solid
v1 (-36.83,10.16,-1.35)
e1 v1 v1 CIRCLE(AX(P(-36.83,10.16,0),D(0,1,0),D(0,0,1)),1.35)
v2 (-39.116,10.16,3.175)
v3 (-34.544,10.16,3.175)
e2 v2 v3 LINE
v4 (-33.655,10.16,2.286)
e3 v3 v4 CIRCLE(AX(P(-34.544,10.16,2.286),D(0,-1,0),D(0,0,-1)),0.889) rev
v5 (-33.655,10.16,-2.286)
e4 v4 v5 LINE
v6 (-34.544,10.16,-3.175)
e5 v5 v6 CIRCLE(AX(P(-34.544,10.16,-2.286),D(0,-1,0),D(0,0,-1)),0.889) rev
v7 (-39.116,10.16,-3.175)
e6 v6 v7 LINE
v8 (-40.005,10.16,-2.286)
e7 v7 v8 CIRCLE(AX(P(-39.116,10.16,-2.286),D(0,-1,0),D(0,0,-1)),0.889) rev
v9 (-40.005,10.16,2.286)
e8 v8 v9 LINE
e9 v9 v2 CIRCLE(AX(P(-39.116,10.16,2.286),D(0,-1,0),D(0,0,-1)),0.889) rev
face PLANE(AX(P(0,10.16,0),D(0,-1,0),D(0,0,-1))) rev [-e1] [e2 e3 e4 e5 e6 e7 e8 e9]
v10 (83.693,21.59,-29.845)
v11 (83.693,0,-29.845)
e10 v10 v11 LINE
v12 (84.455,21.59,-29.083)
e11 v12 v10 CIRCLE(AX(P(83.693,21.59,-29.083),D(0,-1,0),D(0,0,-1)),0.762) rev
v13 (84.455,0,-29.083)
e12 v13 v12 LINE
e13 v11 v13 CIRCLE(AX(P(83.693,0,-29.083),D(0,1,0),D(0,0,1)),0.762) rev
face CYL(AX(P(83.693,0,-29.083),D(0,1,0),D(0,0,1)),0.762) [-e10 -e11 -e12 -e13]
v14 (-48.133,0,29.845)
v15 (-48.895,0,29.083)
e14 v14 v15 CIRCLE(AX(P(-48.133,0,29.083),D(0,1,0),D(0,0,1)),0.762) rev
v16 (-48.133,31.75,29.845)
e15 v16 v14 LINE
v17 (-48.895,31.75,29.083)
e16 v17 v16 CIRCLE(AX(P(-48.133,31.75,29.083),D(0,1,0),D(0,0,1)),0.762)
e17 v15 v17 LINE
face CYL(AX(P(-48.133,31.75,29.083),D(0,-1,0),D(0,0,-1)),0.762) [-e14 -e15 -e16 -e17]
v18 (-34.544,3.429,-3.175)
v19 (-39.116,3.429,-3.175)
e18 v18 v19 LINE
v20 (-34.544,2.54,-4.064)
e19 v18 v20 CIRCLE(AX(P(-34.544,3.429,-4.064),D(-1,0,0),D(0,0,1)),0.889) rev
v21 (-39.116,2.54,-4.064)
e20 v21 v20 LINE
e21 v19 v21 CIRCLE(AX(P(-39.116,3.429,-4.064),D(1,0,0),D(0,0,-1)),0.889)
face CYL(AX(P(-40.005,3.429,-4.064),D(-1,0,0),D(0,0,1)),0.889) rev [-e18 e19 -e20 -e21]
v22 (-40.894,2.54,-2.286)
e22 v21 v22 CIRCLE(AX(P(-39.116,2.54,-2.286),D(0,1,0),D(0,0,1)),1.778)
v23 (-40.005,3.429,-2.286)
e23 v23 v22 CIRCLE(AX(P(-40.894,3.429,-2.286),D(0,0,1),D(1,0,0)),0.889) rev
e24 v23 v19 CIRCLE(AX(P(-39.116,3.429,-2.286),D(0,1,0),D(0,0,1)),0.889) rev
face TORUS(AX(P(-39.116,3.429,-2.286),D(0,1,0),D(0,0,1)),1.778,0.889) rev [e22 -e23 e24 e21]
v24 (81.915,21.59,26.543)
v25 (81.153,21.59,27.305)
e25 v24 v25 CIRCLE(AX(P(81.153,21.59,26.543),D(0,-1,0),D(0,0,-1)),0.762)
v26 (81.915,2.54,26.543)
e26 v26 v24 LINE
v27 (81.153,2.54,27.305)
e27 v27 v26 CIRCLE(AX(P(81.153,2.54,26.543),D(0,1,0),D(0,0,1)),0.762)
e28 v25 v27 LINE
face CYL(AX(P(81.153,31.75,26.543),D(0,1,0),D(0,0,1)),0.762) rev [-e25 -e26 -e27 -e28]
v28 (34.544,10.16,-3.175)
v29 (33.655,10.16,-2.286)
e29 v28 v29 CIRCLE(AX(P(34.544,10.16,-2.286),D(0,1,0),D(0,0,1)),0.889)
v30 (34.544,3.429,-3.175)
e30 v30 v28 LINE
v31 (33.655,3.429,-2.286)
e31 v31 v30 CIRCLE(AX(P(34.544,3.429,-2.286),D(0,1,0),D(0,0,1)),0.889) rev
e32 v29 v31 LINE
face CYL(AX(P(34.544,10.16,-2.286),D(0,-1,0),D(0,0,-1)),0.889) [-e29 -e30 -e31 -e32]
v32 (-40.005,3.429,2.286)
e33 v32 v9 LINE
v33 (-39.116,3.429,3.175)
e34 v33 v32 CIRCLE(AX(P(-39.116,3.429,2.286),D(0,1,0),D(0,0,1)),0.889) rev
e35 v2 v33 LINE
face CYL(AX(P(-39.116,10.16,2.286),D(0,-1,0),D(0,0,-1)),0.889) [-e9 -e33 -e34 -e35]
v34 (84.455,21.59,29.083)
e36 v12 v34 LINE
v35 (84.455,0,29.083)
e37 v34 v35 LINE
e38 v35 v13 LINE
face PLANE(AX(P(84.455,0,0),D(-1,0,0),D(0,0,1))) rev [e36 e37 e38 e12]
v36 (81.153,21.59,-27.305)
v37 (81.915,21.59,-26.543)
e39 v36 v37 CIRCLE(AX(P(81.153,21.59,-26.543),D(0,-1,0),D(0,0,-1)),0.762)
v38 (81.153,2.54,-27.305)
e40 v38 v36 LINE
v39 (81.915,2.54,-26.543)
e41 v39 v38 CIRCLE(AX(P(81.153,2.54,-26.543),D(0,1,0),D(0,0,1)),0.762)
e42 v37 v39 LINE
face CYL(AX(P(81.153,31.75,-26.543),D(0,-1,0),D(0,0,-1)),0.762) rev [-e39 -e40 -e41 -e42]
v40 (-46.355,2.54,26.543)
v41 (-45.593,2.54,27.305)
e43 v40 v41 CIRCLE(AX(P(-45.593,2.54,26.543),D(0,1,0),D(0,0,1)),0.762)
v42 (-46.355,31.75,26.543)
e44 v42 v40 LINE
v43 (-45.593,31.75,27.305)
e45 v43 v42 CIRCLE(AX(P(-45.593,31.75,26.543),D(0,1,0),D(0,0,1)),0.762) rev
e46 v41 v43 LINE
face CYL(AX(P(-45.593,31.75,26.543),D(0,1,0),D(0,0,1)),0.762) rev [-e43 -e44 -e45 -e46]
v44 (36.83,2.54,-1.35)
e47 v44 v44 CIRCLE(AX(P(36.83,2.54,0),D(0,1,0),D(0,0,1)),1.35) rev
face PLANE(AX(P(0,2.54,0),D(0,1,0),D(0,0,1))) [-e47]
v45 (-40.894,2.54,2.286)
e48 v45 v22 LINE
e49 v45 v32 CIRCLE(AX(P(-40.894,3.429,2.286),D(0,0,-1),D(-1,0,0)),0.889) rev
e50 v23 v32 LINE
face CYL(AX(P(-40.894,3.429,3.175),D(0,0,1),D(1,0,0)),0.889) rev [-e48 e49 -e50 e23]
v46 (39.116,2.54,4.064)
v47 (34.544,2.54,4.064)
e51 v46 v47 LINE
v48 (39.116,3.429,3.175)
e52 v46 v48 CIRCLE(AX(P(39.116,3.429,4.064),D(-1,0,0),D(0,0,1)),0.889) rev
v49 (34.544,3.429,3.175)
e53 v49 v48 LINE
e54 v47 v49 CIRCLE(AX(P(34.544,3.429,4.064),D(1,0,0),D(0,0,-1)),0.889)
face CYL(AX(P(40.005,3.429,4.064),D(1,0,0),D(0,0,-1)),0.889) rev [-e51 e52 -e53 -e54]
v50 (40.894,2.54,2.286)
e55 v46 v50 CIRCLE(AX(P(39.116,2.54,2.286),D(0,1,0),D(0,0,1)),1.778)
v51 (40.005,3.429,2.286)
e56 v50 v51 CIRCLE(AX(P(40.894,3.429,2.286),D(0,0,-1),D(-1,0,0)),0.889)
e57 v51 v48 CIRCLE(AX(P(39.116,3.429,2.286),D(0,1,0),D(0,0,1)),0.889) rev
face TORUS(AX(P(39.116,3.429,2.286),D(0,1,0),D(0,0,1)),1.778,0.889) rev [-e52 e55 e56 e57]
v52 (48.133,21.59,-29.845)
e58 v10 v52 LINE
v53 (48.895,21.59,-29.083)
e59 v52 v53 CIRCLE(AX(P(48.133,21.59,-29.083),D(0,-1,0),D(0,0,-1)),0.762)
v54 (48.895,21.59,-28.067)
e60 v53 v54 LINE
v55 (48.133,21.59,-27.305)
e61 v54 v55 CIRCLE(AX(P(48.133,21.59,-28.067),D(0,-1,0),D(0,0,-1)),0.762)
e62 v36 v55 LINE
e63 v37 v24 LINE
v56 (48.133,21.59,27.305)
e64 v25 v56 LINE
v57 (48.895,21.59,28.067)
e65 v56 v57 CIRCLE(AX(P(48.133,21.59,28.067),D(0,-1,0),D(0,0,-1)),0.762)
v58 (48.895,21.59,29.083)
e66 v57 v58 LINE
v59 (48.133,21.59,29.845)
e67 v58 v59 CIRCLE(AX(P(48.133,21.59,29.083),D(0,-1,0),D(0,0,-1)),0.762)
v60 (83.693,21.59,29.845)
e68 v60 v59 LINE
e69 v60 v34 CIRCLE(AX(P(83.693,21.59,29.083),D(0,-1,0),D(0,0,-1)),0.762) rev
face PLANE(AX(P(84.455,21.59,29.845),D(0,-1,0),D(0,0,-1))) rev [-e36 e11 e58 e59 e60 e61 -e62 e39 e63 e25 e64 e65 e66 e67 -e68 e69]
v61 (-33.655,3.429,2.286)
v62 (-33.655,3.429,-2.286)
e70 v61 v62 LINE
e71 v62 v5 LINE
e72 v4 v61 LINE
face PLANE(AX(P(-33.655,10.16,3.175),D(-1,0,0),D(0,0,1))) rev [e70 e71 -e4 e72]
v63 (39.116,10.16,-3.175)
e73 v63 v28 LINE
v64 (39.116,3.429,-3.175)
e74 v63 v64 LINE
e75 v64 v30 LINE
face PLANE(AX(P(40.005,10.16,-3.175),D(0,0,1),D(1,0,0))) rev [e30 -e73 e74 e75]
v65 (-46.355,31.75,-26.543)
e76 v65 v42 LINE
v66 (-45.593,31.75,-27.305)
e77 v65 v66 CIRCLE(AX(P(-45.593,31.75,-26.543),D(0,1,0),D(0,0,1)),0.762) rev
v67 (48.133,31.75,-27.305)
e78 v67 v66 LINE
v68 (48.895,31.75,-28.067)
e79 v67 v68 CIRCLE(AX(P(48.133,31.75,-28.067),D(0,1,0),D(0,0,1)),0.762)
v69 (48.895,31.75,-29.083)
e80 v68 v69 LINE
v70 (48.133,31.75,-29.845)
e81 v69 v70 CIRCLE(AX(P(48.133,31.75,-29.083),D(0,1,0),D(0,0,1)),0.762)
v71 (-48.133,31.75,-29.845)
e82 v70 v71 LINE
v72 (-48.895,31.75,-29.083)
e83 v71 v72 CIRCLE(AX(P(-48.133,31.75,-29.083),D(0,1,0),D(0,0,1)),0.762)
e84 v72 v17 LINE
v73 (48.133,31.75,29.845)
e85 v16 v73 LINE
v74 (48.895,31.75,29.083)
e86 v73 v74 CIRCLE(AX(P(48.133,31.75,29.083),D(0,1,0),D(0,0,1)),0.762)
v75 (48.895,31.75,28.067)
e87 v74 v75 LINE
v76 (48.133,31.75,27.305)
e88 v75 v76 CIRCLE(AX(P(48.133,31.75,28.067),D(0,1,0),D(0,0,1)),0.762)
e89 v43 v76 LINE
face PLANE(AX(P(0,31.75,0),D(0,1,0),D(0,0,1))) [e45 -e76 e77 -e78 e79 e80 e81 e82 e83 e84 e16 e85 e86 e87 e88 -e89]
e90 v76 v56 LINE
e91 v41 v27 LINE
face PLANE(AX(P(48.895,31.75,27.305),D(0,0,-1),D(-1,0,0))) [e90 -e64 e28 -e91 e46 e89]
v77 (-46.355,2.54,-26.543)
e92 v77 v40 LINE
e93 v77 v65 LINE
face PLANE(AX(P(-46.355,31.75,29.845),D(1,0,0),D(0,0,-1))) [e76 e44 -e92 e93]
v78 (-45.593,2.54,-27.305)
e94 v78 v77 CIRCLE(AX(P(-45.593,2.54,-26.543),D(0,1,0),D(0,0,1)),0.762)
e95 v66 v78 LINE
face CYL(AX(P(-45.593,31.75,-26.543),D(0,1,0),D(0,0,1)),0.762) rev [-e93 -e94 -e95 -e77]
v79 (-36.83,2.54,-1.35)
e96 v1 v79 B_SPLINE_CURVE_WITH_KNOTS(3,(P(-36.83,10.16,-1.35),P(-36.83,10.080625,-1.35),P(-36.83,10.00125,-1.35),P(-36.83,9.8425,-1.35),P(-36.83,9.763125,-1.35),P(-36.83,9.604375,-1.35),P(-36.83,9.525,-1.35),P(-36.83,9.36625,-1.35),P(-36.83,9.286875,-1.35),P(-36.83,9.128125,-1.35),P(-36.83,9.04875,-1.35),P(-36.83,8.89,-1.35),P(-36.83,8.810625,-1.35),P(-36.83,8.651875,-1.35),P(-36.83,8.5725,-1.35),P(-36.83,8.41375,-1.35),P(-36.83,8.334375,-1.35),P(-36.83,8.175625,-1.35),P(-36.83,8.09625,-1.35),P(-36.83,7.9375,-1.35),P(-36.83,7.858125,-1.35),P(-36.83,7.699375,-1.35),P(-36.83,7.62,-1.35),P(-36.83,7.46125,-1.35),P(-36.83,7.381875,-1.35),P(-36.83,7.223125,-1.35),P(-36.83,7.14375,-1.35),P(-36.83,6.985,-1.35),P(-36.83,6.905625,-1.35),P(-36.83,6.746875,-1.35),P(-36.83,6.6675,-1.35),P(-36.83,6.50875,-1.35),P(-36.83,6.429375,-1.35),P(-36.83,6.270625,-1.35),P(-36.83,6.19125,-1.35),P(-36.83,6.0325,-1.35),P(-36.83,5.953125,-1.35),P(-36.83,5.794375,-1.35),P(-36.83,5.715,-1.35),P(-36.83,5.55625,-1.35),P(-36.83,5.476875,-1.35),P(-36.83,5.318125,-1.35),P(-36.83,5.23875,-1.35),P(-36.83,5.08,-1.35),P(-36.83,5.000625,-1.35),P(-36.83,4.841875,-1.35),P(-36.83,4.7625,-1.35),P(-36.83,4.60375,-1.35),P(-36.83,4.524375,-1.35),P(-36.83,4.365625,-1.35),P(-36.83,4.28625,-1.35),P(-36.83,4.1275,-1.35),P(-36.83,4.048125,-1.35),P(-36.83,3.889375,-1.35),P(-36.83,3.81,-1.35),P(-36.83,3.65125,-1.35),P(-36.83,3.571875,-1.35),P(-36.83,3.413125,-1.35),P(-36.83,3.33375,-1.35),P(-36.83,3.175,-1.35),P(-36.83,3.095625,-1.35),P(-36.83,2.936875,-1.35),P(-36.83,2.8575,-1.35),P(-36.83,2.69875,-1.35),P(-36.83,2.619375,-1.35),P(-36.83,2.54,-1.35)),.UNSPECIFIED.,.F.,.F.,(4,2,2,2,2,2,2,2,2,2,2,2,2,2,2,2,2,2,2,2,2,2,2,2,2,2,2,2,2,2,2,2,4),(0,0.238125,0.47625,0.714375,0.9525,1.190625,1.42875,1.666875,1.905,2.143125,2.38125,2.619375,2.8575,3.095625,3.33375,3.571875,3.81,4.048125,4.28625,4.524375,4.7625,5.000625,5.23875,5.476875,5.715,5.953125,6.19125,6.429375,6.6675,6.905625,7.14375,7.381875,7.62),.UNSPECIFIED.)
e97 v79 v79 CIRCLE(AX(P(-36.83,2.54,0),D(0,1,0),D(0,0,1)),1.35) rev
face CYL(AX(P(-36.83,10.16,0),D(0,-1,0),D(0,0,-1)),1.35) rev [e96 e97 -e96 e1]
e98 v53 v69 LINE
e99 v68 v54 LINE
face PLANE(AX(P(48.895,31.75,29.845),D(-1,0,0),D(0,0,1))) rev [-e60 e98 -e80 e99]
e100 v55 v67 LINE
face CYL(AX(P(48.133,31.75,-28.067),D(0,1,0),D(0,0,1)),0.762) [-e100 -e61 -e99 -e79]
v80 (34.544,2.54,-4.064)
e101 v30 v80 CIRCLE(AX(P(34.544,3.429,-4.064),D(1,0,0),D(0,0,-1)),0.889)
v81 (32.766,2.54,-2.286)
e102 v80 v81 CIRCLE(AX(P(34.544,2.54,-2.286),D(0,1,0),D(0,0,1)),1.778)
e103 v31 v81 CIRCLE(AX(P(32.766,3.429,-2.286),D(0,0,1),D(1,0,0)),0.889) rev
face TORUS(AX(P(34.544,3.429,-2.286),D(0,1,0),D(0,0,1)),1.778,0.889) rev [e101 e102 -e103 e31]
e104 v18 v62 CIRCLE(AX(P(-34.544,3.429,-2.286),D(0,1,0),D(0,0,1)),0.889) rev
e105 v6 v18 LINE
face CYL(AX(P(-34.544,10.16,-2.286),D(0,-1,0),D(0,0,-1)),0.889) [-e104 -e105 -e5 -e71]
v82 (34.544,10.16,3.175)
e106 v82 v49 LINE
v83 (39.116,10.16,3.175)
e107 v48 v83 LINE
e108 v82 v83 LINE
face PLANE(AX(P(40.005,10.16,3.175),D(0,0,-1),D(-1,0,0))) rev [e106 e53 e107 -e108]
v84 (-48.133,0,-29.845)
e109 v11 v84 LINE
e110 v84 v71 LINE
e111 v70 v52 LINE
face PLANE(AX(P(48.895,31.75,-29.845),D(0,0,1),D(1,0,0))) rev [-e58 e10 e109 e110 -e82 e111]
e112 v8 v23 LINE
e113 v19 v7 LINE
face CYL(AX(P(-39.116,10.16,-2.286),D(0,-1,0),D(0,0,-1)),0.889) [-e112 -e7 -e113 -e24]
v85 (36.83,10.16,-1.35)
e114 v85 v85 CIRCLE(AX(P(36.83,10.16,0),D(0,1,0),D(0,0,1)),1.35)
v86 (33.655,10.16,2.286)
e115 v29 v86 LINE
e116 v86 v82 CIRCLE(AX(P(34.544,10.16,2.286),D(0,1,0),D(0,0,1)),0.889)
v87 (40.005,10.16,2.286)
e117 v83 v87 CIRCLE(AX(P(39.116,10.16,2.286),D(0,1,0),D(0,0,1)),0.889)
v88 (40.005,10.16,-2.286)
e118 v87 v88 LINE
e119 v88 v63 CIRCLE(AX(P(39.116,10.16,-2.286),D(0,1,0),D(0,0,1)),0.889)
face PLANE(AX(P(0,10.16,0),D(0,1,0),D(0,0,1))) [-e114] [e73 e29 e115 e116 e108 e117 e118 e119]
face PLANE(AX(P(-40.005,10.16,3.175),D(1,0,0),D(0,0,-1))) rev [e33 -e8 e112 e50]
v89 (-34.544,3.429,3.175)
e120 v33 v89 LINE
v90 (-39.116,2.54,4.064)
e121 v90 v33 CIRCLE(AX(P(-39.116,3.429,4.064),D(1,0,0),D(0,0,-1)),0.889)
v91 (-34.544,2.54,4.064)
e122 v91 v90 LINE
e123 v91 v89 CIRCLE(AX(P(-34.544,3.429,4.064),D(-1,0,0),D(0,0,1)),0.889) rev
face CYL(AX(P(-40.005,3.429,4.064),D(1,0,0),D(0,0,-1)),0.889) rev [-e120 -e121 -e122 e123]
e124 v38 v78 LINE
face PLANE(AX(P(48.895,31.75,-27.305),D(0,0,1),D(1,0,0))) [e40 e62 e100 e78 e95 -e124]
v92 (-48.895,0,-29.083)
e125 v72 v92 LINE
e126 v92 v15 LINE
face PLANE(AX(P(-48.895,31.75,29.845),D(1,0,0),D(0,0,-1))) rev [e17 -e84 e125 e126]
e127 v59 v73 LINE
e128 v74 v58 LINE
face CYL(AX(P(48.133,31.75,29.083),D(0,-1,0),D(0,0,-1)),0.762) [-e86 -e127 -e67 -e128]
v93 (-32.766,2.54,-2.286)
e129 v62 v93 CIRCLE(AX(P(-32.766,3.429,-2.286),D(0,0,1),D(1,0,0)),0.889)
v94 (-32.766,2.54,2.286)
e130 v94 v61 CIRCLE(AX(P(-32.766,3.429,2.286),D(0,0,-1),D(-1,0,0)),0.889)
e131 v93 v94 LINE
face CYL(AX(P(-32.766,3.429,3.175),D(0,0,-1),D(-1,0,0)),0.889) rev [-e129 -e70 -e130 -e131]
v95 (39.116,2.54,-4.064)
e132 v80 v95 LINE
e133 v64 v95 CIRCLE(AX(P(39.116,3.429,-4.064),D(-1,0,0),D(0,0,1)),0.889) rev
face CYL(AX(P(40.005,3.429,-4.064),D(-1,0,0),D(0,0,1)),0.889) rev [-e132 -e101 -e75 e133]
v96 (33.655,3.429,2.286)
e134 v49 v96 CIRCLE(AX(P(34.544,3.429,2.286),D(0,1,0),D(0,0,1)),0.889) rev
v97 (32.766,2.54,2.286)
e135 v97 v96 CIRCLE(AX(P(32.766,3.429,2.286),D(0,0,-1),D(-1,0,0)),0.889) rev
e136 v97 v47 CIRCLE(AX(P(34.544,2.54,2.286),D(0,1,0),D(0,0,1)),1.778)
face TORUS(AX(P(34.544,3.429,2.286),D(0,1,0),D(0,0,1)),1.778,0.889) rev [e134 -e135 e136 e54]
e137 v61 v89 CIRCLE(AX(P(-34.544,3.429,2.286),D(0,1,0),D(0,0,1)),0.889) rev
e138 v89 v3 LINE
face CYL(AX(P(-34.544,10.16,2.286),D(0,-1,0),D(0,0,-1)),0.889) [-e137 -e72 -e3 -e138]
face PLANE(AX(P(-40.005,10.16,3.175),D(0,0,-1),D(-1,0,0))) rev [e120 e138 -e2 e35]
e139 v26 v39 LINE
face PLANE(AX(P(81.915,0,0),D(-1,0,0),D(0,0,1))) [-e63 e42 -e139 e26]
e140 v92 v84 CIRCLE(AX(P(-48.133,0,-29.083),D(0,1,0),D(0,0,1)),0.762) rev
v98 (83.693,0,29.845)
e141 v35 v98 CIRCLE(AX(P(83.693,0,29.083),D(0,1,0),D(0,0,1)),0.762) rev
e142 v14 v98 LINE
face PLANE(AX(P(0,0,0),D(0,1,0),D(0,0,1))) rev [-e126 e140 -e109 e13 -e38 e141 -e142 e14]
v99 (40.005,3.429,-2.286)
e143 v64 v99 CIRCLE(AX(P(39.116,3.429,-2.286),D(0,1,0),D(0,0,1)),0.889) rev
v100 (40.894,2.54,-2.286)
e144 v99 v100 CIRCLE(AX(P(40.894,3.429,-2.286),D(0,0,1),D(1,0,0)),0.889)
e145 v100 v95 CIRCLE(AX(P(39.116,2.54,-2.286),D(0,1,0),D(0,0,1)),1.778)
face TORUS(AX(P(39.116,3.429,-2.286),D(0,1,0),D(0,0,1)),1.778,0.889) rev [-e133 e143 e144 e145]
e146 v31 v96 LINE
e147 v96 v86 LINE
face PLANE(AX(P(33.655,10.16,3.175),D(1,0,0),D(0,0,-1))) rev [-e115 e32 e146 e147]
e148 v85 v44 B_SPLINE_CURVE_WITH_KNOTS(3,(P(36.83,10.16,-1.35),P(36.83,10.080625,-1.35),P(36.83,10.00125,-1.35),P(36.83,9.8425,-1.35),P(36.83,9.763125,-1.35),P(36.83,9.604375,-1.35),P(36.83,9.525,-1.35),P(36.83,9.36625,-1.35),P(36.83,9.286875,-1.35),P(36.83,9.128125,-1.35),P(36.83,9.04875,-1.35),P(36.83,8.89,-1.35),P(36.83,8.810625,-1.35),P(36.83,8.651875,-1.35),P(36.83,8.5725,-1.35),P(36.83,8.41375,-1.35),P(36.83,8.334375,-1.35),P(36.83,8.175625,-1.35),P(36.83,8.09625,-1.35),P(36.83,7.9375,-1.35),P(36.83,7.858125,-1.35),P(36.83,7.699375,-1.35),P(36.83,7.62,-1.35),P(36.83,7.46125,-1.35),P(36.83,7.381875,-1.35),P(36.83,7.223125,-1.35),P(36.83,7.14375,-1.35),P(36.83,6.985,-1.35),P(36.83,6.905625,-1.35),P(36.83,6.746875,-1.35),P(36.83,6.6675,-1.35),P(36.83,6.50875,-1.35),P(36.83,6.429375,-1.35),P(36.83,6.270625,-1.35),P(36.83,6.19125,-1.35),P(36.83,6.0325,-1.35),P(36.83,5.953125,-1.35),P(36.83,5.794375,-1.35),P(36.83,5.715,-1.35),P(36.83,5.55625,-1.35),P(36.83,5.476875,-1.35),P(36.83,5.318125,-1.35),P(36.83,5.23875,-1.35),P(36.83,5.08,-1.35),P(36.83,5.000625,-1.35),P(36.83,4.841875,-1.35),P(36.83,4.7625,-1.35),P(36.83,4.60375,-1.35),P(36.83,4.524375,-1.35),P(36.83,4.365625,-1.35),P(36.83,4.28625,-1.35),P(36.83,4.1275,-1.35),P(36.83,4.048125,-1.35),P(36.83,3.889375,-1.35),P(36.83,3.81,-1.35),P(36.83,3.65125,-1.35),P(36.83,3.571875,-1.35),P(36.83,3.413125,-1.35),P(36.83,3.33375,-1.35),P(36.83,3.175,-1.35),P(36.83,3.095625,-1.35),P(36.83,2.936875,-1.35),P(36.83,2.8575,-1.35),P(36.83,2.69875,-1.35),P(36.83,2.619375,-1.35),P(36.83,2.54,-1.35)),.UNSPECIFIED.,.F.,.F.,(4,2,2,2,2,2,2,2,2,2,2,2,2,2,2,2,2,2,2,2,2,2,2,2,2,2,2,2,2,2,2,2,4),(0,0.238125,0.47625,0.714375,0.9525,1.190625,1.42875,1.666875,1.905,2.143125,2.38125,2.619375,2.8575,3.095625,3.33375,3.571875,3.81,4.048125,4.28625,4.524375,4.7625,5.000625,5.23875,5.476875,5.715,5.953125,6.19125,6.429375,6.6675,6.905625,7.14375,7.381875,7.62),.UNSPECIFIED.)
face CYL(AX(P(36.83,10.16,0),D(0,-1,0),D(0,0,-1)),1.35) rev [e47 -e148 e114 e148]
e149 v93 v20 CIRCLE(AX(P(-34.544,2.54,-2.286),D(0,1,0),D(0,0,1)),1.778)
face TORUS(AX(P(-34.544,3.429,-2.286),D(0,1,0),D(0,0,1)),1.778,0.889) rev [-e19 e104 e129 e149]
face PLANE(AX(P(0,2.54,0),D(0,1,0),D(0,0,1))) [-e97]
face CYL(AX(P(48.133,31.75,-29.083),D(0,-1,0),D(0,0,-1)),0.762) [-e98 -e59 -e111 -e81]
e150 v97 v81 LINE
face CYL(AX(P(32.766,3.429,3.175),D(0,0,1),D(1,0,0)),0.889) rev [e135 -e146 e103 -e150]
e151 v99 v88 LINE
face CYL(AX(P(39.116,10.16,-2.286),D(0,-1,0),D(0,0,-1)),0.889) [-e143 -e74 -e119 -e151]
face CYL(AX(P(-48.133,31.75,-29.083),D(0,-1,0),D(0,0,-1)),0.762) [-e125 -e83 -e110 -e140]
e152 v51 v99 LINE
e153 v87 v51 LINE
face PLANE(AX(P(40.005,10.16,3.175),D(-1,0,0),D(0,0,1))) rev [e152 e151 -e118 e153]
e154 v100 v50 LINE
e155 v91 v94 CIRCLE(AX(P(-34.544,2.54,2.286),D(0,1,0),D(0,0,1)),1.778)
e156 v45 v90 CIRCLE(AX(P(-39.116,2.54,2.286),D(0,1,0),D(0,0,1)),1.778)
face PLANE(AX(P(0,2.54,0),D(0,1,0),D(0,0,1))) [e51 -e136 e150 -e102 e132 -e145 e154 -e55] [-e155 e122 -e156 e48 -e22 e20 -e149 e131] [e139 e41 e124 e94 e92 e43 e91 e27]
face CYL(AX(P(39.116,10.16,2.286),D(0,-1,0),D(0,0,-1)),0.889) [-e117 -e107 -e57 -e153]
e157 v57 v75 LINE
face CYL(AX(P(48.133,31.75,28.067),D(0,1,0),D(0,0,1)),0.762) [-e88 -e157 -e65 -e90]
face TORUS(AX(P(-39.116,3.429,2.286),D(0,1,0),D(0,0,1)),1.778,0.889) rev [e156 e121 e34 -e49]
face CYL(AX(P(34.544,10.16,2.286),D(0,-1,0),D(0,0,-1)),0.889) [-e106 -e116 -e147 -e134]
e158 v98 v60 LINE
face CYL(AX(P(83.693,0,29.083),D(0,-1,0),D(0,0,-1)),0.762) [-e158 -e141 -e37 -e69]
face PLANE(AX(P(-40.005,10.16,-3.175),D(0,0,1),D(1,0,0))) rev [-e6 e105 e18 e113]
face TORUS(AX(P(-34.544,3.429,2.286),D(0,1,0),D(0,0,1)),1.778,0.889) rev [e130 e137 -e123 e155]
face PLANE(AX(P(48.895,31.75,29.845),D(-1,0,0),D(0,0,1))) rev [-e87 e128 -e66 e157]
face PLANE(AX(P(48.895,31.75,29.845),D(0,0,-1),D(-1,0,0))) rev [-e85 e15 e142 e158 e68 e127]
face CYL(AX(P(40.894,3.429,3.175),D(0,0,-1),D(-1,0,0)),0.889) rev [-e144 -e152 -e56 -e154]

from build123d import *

# Parameters (mm, degrees)
SKETCH1_W           = 97.79
SKETCH1_H           = 59.69
BOSS_EXTRUDE1_DEPTH = 31.75
SHELL1_T            = -2.54
SKETCH2_W           = 6.35
SKETCH2_H           = 6.35
SKETCH2_R           = 1.35
BOSS_EXTRUDE2_DEPTH = 7.62
FILLET2_R           = 0.889
BOSS_EXTRUDE3_DEPTH = 35.56
SHELL2_START        = 2.54
SHELL2_OUTLINE_W    = 33.02
SHELL2_OUTLINE_H    = 54.61
SHELL2_DEPTH        = 19.05
FILLET3_R           = 0.762


# Read off the part's stored shape, not the designer's step: Shell2
with BuildPart() as part:
    # Sketch1 → Boss-Extrude1 (new body)
    with BuildSketch(Plane(origin=(0, 0, 0), x_dir=(1, 0, 0), z_dir=(0, 1, 0))):
        Rectangle(SKETCH1_W, SKETCH1_H)
    extrude(amount=BOSS_EXTRUDE1_DEPTH)

    # Shell1
    shell1_openings = [part.faces().sort_by_distance(p)[0] for p in [
        (0, 31.75, 0),
        (48.895, 15.875, 0),
    ]]
    offset(amount=SHELL1_T, openings=shell1_openings, kind=Kind.INTERSECTION)

    # Sketch2 → Boss-Extrude2 (add)
    # profile 1 of 2: a face of its own
    with BuildSketch(Plane(origin=(0, 2.54, 0), x_dir=(1, 0, 0), z_dir=(0, 1, 0))):
        with Locations((-36.83, 0)):
            Rectangle(SKETCH2_W, SKETCH2_H)
        with Locations(Location((-36.83, 0, 0), (0, 0, 90))):
            Circle(SKETCH2_R, mode=Mode.SUBTRACT)
    # profile 2 of 2: a face of its own
    with BuildSketch(Plane(origin=(0, 2.54, 0), x_dir=(1, 0, 0), z_dir=(0, 1, 0))):
        with Locations((36.83, 0)):
            Rectangle(SKETCH2_W, SKETCH2_H)
        with Locations(Location((36.83, 0, 0), (0, 0, 90))):
            Circle(SKETCH2_R, mode=Mode.SUBTRACT)
    extrude(amount=BOSS_EXTRUDE2_DEPTH)

    # Fillet2
    fillet2_edges = [part.edges().sort_by_distance(p)[0] for p in [
        (-33.655, 2.54, 0),
        (-33.655, 6.35, 3.175),
        (-36.83, 2.54, -3.175),
        (-33.655, 6.35, -3.175),
        (-40.005, 2.54, 0),
        (-40.005, 6.35, -3.175),
        (-36.83, 2.54, 3.175),
        (-40.005, 6.35, 3.175),
        (33.655, 2.54, 0),
        (33.655, 6.35, -3.175),
        (36.83, 2.54, 3.175),
        (33.655, 6.35, 3.175),
        (40.005, 2.54, 0),
        (40.005, 6.35, 3.175),
        (36.83, 2.54, -3.175),
        (40.005, 6.35, -3.175),
    ]]
    fillet(fillet2_edges, radius=FILLET2_R)

    # Sketch4 → Boss-Extrude3 (add)
    with BuildSketch(Plane(origin=(48.895, 0, 0), x_dir=(0, 0, -1), z_dir=(1, 0, 0))):
        Polygon((-29.845, 21.59), (-27.305, 21.59), (27.305, 21.59), (29.845, 21.59), (29.845, 0), (-29.845, 0), align=None)
    extrude(amount=BOSS_EXTRUDE3_DEPTH)

    # Shell2 outline → Shell2 (cut)
    with BuildSketch(Plane(origin=(0, 0, 0), x_dir=(1, 0, 0), z_dir=(0, 1, 0)).offset(SHELL2_START)):
        with Locations((65.405, 0)):
            Rectangle(SHELL2_OUTLINE_W, SHELL2_OUTLINE_H)
    extrude(amount=SHELL2_DEPTH, mode=Mode.SUBTRACT)

    # Fillet3
    fillet3_edges = [part.edges().sort_by_distance(p)[0] for p in [
        (84.455, 10.795, 29.845),
        (84.455, 10.795, -29.845),
        (81.915, 12.065, 27.305),
        (81.915, 12.065, -27.305),
        (-46.355, 17.145, -27.305),
        (-46.355, 17.145, 27.305),
        (48.895, 26.67, 27.305),
        (48.895, 26.67, -27.305),
        (-48.895, 15.875, -29.845),
        (48.895, 26.67, -29.845),
        (48.895, 26.67, 29.845),
        (-48.895, 15.875, 29.845),
    ]]
    fillet(fillet3_edges, radius=FILLET3_R)


solid = part.part
